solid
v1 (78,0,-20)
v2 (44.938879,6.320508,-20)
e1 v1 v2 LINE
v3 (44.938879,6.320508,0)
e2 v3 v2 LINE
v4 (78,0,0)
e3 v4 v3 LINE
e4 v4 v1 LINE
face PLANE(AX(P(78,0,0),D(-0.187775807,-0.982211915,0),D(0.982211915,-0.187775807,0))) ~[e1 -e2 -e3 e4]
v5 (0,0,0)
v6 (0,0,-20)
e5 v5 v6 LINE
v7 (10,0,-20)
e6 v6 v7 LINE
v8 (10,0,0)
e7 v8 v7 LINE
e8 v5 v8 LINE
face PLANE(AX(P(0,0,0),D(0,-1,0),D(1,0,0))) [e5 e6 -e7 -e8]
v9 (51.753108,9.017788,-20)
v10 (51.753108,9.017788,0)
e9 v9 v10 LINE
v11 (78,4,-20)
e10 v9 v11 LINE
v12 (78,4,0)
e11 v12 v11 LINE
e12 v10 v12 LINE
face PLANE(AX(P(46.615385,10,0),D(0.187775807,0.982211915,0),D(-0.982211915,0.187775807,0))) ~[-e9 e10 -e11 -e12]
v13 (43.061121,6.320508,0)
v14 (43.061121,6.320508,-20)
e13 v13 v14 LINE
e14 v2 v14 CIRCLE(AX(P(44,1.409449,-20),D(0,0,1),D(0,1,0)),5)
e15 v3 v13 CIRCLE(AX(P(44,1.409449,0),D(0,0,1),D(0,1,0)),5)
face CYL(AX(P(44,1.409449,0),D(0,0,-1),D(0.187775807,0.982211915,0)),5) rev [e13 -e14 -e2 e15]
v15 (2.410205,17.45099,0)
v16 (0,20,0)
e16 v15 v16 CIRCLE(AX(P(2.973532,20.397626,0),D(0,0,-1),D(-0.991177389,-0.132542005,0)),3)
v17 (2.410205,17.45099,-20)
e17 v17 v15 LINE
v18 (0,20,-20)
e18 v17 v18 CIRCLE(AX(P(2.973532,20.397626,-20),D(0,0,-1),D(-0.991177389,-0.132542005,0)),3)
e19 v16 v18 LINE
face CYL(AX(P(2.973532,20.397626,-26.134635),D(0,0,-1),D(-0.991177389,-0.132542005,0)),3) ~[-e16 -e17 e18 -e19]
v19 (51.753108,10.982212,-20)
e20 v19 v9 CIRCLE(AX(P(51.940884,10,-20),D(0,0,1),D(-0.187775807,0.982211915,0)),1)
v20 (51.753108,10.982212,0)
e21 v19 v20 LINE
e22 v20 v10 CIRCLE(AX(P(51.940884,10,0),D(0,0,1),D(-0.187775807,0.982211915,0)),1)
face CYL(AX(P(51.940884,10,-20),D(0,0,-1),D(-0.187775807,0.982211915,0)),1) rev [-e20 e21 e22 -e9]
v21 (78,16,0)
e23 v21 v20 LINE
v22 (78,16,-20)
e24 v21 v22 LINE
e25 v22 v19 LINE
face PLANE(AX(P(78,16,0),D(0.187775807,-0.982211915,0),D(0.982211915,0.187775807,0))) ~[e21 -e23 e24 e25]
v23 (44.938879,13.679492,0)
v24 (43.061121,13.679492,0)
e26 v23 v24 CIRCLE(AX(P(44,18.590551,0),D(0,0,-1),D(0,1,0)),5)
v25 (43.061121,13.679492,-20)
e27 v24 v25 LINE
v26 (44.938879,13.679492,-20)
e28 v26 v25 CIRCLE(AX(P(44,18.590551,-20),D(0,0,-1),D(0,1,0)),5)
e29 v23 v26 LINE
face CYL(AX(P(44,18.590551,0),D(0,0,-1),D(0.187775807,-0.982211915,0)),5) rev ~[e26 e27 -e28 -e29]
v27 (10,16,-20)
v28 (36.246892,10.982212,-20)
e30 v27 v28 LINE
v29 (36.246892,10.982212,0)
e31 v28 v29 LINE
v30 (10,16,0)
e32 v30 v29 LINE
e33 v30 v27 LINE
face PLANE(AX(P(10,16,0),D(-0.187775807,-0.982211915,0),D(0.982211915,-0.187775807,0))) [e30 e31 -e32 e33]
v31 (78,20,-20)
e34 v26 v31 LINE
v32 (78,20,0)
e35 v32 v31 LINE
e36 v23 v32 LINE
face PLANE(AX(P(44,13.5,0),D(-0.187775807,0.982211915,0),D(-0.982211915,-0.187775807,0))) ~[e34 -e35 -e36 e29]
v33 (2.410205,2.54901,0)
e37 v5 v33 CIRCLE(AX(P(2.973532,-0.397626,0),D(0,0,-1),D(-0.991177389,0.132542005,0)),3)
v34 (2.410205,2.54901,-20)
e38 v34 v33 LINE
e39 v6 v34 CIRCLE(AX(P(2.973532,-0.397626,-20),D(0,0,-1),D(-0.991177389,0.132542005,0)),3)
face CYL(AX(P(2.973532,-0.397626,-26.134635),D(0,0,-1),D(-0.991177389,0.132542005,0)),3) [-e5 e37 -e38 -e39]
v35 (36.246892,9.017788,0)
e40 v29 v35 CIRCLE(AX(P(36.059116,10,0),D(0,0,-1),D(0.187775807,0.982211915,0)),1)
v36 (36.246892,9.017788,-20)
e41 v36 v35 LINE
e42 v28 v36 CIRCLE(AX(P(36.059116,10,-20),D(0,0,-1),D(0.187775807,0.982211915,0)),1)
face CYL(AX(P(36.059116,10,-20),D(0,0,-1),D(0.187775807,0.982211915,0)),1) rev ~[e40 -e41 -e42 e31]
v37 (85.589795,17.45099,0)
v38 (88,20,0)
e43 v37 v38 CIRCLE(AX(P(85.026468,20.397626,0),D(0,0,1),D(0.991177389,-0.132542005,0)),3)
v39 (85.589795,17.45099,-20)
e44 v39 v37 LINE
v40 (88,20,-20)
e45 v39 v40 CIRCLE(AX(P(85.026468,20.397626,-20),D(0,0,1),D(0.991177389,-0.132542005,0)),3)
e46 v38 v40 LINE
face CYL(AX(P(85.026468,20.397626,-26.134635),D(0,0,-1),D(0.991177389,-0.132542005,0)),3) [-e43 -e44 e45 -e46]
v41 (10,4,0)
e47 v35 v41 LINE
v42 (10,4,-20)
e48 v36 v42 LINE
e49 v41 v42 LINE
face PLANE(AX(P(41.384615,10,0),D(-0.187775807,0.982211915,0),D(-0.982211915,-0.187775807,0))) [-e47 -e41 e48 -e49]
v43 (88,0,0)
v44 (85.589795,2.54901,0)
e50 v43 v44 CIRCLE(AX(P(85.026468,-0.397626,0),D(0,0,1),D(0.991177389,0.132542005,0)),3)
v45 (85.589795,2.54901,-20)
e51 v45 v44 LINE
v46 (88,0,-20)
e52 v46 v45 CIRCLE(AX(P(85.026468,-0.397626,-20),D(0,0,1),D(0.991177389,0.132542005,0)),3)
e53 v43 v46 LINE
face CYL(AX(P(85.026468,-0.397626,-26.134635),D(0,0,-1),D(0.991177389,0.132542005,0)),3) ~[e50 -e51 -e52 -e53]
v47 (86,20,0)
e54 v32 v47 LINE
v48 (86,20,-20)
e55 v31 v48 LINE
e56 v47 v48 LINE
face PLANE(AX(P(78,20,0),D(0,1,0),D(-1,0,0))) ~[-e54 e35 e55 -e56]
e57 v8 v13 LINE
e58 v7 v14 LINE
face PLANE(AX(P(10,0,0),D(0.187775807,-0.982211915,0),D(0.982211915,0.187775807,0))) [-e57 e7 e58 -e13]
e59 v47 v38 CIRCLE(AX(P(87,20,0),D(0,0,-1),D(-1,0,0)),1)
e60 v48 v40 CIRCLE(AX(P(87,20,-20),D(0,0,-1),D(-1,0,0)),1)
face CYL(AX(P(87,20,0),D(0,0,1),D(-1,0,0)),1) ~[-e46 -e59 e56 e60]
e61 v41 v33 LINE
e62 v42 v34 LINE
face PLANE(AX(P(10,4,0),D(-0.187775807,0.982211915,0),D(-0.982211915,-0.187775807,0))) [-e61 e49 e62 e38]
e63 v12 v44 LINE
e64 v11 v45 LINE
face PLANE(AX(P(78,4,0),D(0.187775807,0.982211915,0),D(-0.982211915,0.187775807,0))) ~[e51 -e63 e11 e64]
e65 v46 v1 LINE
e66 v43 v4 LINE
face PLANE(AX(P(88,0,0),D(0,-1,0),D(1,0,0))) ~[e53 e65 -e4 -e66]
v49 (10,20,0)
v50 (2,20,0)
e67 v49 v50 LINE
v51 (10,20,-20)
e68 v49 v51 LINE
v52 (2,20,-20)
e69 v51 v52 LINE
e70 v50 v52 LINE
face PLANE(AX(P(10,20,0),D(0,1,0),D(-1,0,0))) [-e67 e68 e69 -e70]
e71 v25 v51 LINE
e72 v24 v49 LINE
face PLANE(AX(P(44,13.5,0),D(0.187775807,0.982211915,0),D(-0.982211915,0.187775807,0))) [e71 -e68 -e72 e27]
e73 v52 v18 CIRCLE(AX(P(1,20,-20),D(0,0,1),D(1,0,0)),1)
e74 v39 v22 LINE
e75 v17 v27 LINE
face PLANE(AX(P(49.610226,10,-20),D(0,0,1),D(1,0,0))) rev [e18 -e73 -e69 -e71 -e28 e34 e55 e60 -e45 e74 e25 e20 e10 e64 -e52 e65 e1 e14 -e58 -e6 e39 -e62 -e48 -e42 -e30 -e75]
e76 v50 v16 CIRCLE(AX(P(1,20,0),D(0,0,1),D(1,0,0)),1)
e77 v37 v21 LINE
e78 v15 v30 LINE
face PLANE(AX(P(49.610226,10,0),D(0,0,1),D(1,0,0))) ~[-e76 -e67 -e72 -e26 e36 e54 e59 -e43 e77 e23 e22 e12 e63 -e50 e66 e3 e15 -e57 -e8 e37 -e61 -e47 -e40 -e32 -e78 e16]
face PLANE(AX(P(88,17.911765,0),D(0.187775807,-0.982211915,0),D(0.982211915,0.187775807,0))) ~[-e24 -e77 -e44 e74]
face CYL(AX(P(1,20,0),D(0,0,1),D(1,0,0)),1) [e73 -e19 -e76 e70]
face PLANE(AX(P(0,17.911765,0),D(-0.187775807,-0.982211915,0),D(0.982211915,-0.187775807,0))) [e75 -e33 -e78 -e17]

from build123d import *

# Parameters (mm, degrees)
F1_DEPTH    = 20
F2_T1_DEPTH = 20
F3_T1_DEPTH = 32.2692705553
F5_R        = 5


# Not quite as in the source:
# - a fillet or chamfer that OpenCascade refuses, or shapes differently, is made with other operations: its cross-section is extruded or revolved along the edge and cut away or added


with BuildPart() as f1:
    # F0 (on Top) → F1 (new body)
    with BuildSketch(Plane.XY):
        Polygon((0, 2.0882352941), (0, 0), (10, 0), (44, 6.5), (44, 13.5), (10, 20), (2, 20), (0, 20), (0, 17.9117647059), (10, 16), (41.3846153846, 10), (10, 4), align=None)
        with BuildLine():
            Line((0, 20), (2, 20))
            ThreePointArc((2, 20), (1, 21), (0, 20))
        make_face()
    extrude(amount=-F1_DEPTH)

    # F2: fillet of radius 1 on 1 edges, made by hand

    # F2_s2 → F2_t1 (join)
    with BuildSketch(Plane.XY.offset(-20)):
        with BuildLine():
            ThreePointArc((36.2468915209, 10.9822119151), (37.0591157136, 10), (36.2468915209, 9.0177880849))
            Line((36.2468915209, 9.0177880849), (41.3846153846, 10))
            Line((41.3846153846, 10), (36.2468915209, 10.9822119151))
        make_face()
    extrude(amount=F2_T1_DEPTH)

    # F3: fillet of radius 3 on 2 edges, made by hand

    # F3_s2 → F3_t1 (cut)
    with BuildSketch(Plane.XY.offset(-26.1346352777)):
        with BuildLine():
            ThreePointArc((0, 20), (0.7936912123, 18.3364871524), (2.4102047458, 17.4509902692))
            Line((2.4102047458, 17.4509902692), (2.3989381974, 17.3920575543))
            Line((2.3989381974, 17.3920575543), (-0.0112665484, 17.852831991))
            Line((-0.0112665484, 17.852831991), (-0.06, 17.9117647059))
            ThreePointArc((-0.06, 17.9117647059), (-0.06, 18.9558823529), (-0.0594706434, 19.9920474797))
            Line((-0.0594706434, 19.9920474797), (0, 20))
        make_face()
        with BuildLine():
            ThreePointArc((0, 0), (0.7936912123, 1.6635128476), (2.4102047458, 2.5490097308))
            Line((2.4102047458, 2.5490097308), (2.3989381974, 2.6079424457))
            Line((2.3989381974, 2.6079424457), (-0.0112665484, 2.147168009))
            Line((-0.0112665484, 2.147168009), (-0.06, 2.0882352941))
            ThreePointArc((-0.06, 2.0882352941), (-0.06, 1.0441176471), (-0.0594706434, 0.0079525203))
            Line((-0.0594706434, 0.0079525203), (0, 0))
        make_face()
    extrude(amount=F3_T1_DEPTH, mode=Mode.SUBTRACT)

    # F4: F1 across face


with BuildPart() as f1_1:
    add(f1.part)
    add(f1.part.mirror(Plane(origin=(44, 10, -10), x_dir=(0, 1, 0), z_dir=(1, 0, 0))))

    # F5
    f5_edges = [f1_1.edges().sort_by_distance(p)[0] for p in [
        (44, 13.5, -10),
        (44, 6.5, -10),
    ]]
    fillet(f5_edges, radius=F5_R)


solid = f1_1.part
